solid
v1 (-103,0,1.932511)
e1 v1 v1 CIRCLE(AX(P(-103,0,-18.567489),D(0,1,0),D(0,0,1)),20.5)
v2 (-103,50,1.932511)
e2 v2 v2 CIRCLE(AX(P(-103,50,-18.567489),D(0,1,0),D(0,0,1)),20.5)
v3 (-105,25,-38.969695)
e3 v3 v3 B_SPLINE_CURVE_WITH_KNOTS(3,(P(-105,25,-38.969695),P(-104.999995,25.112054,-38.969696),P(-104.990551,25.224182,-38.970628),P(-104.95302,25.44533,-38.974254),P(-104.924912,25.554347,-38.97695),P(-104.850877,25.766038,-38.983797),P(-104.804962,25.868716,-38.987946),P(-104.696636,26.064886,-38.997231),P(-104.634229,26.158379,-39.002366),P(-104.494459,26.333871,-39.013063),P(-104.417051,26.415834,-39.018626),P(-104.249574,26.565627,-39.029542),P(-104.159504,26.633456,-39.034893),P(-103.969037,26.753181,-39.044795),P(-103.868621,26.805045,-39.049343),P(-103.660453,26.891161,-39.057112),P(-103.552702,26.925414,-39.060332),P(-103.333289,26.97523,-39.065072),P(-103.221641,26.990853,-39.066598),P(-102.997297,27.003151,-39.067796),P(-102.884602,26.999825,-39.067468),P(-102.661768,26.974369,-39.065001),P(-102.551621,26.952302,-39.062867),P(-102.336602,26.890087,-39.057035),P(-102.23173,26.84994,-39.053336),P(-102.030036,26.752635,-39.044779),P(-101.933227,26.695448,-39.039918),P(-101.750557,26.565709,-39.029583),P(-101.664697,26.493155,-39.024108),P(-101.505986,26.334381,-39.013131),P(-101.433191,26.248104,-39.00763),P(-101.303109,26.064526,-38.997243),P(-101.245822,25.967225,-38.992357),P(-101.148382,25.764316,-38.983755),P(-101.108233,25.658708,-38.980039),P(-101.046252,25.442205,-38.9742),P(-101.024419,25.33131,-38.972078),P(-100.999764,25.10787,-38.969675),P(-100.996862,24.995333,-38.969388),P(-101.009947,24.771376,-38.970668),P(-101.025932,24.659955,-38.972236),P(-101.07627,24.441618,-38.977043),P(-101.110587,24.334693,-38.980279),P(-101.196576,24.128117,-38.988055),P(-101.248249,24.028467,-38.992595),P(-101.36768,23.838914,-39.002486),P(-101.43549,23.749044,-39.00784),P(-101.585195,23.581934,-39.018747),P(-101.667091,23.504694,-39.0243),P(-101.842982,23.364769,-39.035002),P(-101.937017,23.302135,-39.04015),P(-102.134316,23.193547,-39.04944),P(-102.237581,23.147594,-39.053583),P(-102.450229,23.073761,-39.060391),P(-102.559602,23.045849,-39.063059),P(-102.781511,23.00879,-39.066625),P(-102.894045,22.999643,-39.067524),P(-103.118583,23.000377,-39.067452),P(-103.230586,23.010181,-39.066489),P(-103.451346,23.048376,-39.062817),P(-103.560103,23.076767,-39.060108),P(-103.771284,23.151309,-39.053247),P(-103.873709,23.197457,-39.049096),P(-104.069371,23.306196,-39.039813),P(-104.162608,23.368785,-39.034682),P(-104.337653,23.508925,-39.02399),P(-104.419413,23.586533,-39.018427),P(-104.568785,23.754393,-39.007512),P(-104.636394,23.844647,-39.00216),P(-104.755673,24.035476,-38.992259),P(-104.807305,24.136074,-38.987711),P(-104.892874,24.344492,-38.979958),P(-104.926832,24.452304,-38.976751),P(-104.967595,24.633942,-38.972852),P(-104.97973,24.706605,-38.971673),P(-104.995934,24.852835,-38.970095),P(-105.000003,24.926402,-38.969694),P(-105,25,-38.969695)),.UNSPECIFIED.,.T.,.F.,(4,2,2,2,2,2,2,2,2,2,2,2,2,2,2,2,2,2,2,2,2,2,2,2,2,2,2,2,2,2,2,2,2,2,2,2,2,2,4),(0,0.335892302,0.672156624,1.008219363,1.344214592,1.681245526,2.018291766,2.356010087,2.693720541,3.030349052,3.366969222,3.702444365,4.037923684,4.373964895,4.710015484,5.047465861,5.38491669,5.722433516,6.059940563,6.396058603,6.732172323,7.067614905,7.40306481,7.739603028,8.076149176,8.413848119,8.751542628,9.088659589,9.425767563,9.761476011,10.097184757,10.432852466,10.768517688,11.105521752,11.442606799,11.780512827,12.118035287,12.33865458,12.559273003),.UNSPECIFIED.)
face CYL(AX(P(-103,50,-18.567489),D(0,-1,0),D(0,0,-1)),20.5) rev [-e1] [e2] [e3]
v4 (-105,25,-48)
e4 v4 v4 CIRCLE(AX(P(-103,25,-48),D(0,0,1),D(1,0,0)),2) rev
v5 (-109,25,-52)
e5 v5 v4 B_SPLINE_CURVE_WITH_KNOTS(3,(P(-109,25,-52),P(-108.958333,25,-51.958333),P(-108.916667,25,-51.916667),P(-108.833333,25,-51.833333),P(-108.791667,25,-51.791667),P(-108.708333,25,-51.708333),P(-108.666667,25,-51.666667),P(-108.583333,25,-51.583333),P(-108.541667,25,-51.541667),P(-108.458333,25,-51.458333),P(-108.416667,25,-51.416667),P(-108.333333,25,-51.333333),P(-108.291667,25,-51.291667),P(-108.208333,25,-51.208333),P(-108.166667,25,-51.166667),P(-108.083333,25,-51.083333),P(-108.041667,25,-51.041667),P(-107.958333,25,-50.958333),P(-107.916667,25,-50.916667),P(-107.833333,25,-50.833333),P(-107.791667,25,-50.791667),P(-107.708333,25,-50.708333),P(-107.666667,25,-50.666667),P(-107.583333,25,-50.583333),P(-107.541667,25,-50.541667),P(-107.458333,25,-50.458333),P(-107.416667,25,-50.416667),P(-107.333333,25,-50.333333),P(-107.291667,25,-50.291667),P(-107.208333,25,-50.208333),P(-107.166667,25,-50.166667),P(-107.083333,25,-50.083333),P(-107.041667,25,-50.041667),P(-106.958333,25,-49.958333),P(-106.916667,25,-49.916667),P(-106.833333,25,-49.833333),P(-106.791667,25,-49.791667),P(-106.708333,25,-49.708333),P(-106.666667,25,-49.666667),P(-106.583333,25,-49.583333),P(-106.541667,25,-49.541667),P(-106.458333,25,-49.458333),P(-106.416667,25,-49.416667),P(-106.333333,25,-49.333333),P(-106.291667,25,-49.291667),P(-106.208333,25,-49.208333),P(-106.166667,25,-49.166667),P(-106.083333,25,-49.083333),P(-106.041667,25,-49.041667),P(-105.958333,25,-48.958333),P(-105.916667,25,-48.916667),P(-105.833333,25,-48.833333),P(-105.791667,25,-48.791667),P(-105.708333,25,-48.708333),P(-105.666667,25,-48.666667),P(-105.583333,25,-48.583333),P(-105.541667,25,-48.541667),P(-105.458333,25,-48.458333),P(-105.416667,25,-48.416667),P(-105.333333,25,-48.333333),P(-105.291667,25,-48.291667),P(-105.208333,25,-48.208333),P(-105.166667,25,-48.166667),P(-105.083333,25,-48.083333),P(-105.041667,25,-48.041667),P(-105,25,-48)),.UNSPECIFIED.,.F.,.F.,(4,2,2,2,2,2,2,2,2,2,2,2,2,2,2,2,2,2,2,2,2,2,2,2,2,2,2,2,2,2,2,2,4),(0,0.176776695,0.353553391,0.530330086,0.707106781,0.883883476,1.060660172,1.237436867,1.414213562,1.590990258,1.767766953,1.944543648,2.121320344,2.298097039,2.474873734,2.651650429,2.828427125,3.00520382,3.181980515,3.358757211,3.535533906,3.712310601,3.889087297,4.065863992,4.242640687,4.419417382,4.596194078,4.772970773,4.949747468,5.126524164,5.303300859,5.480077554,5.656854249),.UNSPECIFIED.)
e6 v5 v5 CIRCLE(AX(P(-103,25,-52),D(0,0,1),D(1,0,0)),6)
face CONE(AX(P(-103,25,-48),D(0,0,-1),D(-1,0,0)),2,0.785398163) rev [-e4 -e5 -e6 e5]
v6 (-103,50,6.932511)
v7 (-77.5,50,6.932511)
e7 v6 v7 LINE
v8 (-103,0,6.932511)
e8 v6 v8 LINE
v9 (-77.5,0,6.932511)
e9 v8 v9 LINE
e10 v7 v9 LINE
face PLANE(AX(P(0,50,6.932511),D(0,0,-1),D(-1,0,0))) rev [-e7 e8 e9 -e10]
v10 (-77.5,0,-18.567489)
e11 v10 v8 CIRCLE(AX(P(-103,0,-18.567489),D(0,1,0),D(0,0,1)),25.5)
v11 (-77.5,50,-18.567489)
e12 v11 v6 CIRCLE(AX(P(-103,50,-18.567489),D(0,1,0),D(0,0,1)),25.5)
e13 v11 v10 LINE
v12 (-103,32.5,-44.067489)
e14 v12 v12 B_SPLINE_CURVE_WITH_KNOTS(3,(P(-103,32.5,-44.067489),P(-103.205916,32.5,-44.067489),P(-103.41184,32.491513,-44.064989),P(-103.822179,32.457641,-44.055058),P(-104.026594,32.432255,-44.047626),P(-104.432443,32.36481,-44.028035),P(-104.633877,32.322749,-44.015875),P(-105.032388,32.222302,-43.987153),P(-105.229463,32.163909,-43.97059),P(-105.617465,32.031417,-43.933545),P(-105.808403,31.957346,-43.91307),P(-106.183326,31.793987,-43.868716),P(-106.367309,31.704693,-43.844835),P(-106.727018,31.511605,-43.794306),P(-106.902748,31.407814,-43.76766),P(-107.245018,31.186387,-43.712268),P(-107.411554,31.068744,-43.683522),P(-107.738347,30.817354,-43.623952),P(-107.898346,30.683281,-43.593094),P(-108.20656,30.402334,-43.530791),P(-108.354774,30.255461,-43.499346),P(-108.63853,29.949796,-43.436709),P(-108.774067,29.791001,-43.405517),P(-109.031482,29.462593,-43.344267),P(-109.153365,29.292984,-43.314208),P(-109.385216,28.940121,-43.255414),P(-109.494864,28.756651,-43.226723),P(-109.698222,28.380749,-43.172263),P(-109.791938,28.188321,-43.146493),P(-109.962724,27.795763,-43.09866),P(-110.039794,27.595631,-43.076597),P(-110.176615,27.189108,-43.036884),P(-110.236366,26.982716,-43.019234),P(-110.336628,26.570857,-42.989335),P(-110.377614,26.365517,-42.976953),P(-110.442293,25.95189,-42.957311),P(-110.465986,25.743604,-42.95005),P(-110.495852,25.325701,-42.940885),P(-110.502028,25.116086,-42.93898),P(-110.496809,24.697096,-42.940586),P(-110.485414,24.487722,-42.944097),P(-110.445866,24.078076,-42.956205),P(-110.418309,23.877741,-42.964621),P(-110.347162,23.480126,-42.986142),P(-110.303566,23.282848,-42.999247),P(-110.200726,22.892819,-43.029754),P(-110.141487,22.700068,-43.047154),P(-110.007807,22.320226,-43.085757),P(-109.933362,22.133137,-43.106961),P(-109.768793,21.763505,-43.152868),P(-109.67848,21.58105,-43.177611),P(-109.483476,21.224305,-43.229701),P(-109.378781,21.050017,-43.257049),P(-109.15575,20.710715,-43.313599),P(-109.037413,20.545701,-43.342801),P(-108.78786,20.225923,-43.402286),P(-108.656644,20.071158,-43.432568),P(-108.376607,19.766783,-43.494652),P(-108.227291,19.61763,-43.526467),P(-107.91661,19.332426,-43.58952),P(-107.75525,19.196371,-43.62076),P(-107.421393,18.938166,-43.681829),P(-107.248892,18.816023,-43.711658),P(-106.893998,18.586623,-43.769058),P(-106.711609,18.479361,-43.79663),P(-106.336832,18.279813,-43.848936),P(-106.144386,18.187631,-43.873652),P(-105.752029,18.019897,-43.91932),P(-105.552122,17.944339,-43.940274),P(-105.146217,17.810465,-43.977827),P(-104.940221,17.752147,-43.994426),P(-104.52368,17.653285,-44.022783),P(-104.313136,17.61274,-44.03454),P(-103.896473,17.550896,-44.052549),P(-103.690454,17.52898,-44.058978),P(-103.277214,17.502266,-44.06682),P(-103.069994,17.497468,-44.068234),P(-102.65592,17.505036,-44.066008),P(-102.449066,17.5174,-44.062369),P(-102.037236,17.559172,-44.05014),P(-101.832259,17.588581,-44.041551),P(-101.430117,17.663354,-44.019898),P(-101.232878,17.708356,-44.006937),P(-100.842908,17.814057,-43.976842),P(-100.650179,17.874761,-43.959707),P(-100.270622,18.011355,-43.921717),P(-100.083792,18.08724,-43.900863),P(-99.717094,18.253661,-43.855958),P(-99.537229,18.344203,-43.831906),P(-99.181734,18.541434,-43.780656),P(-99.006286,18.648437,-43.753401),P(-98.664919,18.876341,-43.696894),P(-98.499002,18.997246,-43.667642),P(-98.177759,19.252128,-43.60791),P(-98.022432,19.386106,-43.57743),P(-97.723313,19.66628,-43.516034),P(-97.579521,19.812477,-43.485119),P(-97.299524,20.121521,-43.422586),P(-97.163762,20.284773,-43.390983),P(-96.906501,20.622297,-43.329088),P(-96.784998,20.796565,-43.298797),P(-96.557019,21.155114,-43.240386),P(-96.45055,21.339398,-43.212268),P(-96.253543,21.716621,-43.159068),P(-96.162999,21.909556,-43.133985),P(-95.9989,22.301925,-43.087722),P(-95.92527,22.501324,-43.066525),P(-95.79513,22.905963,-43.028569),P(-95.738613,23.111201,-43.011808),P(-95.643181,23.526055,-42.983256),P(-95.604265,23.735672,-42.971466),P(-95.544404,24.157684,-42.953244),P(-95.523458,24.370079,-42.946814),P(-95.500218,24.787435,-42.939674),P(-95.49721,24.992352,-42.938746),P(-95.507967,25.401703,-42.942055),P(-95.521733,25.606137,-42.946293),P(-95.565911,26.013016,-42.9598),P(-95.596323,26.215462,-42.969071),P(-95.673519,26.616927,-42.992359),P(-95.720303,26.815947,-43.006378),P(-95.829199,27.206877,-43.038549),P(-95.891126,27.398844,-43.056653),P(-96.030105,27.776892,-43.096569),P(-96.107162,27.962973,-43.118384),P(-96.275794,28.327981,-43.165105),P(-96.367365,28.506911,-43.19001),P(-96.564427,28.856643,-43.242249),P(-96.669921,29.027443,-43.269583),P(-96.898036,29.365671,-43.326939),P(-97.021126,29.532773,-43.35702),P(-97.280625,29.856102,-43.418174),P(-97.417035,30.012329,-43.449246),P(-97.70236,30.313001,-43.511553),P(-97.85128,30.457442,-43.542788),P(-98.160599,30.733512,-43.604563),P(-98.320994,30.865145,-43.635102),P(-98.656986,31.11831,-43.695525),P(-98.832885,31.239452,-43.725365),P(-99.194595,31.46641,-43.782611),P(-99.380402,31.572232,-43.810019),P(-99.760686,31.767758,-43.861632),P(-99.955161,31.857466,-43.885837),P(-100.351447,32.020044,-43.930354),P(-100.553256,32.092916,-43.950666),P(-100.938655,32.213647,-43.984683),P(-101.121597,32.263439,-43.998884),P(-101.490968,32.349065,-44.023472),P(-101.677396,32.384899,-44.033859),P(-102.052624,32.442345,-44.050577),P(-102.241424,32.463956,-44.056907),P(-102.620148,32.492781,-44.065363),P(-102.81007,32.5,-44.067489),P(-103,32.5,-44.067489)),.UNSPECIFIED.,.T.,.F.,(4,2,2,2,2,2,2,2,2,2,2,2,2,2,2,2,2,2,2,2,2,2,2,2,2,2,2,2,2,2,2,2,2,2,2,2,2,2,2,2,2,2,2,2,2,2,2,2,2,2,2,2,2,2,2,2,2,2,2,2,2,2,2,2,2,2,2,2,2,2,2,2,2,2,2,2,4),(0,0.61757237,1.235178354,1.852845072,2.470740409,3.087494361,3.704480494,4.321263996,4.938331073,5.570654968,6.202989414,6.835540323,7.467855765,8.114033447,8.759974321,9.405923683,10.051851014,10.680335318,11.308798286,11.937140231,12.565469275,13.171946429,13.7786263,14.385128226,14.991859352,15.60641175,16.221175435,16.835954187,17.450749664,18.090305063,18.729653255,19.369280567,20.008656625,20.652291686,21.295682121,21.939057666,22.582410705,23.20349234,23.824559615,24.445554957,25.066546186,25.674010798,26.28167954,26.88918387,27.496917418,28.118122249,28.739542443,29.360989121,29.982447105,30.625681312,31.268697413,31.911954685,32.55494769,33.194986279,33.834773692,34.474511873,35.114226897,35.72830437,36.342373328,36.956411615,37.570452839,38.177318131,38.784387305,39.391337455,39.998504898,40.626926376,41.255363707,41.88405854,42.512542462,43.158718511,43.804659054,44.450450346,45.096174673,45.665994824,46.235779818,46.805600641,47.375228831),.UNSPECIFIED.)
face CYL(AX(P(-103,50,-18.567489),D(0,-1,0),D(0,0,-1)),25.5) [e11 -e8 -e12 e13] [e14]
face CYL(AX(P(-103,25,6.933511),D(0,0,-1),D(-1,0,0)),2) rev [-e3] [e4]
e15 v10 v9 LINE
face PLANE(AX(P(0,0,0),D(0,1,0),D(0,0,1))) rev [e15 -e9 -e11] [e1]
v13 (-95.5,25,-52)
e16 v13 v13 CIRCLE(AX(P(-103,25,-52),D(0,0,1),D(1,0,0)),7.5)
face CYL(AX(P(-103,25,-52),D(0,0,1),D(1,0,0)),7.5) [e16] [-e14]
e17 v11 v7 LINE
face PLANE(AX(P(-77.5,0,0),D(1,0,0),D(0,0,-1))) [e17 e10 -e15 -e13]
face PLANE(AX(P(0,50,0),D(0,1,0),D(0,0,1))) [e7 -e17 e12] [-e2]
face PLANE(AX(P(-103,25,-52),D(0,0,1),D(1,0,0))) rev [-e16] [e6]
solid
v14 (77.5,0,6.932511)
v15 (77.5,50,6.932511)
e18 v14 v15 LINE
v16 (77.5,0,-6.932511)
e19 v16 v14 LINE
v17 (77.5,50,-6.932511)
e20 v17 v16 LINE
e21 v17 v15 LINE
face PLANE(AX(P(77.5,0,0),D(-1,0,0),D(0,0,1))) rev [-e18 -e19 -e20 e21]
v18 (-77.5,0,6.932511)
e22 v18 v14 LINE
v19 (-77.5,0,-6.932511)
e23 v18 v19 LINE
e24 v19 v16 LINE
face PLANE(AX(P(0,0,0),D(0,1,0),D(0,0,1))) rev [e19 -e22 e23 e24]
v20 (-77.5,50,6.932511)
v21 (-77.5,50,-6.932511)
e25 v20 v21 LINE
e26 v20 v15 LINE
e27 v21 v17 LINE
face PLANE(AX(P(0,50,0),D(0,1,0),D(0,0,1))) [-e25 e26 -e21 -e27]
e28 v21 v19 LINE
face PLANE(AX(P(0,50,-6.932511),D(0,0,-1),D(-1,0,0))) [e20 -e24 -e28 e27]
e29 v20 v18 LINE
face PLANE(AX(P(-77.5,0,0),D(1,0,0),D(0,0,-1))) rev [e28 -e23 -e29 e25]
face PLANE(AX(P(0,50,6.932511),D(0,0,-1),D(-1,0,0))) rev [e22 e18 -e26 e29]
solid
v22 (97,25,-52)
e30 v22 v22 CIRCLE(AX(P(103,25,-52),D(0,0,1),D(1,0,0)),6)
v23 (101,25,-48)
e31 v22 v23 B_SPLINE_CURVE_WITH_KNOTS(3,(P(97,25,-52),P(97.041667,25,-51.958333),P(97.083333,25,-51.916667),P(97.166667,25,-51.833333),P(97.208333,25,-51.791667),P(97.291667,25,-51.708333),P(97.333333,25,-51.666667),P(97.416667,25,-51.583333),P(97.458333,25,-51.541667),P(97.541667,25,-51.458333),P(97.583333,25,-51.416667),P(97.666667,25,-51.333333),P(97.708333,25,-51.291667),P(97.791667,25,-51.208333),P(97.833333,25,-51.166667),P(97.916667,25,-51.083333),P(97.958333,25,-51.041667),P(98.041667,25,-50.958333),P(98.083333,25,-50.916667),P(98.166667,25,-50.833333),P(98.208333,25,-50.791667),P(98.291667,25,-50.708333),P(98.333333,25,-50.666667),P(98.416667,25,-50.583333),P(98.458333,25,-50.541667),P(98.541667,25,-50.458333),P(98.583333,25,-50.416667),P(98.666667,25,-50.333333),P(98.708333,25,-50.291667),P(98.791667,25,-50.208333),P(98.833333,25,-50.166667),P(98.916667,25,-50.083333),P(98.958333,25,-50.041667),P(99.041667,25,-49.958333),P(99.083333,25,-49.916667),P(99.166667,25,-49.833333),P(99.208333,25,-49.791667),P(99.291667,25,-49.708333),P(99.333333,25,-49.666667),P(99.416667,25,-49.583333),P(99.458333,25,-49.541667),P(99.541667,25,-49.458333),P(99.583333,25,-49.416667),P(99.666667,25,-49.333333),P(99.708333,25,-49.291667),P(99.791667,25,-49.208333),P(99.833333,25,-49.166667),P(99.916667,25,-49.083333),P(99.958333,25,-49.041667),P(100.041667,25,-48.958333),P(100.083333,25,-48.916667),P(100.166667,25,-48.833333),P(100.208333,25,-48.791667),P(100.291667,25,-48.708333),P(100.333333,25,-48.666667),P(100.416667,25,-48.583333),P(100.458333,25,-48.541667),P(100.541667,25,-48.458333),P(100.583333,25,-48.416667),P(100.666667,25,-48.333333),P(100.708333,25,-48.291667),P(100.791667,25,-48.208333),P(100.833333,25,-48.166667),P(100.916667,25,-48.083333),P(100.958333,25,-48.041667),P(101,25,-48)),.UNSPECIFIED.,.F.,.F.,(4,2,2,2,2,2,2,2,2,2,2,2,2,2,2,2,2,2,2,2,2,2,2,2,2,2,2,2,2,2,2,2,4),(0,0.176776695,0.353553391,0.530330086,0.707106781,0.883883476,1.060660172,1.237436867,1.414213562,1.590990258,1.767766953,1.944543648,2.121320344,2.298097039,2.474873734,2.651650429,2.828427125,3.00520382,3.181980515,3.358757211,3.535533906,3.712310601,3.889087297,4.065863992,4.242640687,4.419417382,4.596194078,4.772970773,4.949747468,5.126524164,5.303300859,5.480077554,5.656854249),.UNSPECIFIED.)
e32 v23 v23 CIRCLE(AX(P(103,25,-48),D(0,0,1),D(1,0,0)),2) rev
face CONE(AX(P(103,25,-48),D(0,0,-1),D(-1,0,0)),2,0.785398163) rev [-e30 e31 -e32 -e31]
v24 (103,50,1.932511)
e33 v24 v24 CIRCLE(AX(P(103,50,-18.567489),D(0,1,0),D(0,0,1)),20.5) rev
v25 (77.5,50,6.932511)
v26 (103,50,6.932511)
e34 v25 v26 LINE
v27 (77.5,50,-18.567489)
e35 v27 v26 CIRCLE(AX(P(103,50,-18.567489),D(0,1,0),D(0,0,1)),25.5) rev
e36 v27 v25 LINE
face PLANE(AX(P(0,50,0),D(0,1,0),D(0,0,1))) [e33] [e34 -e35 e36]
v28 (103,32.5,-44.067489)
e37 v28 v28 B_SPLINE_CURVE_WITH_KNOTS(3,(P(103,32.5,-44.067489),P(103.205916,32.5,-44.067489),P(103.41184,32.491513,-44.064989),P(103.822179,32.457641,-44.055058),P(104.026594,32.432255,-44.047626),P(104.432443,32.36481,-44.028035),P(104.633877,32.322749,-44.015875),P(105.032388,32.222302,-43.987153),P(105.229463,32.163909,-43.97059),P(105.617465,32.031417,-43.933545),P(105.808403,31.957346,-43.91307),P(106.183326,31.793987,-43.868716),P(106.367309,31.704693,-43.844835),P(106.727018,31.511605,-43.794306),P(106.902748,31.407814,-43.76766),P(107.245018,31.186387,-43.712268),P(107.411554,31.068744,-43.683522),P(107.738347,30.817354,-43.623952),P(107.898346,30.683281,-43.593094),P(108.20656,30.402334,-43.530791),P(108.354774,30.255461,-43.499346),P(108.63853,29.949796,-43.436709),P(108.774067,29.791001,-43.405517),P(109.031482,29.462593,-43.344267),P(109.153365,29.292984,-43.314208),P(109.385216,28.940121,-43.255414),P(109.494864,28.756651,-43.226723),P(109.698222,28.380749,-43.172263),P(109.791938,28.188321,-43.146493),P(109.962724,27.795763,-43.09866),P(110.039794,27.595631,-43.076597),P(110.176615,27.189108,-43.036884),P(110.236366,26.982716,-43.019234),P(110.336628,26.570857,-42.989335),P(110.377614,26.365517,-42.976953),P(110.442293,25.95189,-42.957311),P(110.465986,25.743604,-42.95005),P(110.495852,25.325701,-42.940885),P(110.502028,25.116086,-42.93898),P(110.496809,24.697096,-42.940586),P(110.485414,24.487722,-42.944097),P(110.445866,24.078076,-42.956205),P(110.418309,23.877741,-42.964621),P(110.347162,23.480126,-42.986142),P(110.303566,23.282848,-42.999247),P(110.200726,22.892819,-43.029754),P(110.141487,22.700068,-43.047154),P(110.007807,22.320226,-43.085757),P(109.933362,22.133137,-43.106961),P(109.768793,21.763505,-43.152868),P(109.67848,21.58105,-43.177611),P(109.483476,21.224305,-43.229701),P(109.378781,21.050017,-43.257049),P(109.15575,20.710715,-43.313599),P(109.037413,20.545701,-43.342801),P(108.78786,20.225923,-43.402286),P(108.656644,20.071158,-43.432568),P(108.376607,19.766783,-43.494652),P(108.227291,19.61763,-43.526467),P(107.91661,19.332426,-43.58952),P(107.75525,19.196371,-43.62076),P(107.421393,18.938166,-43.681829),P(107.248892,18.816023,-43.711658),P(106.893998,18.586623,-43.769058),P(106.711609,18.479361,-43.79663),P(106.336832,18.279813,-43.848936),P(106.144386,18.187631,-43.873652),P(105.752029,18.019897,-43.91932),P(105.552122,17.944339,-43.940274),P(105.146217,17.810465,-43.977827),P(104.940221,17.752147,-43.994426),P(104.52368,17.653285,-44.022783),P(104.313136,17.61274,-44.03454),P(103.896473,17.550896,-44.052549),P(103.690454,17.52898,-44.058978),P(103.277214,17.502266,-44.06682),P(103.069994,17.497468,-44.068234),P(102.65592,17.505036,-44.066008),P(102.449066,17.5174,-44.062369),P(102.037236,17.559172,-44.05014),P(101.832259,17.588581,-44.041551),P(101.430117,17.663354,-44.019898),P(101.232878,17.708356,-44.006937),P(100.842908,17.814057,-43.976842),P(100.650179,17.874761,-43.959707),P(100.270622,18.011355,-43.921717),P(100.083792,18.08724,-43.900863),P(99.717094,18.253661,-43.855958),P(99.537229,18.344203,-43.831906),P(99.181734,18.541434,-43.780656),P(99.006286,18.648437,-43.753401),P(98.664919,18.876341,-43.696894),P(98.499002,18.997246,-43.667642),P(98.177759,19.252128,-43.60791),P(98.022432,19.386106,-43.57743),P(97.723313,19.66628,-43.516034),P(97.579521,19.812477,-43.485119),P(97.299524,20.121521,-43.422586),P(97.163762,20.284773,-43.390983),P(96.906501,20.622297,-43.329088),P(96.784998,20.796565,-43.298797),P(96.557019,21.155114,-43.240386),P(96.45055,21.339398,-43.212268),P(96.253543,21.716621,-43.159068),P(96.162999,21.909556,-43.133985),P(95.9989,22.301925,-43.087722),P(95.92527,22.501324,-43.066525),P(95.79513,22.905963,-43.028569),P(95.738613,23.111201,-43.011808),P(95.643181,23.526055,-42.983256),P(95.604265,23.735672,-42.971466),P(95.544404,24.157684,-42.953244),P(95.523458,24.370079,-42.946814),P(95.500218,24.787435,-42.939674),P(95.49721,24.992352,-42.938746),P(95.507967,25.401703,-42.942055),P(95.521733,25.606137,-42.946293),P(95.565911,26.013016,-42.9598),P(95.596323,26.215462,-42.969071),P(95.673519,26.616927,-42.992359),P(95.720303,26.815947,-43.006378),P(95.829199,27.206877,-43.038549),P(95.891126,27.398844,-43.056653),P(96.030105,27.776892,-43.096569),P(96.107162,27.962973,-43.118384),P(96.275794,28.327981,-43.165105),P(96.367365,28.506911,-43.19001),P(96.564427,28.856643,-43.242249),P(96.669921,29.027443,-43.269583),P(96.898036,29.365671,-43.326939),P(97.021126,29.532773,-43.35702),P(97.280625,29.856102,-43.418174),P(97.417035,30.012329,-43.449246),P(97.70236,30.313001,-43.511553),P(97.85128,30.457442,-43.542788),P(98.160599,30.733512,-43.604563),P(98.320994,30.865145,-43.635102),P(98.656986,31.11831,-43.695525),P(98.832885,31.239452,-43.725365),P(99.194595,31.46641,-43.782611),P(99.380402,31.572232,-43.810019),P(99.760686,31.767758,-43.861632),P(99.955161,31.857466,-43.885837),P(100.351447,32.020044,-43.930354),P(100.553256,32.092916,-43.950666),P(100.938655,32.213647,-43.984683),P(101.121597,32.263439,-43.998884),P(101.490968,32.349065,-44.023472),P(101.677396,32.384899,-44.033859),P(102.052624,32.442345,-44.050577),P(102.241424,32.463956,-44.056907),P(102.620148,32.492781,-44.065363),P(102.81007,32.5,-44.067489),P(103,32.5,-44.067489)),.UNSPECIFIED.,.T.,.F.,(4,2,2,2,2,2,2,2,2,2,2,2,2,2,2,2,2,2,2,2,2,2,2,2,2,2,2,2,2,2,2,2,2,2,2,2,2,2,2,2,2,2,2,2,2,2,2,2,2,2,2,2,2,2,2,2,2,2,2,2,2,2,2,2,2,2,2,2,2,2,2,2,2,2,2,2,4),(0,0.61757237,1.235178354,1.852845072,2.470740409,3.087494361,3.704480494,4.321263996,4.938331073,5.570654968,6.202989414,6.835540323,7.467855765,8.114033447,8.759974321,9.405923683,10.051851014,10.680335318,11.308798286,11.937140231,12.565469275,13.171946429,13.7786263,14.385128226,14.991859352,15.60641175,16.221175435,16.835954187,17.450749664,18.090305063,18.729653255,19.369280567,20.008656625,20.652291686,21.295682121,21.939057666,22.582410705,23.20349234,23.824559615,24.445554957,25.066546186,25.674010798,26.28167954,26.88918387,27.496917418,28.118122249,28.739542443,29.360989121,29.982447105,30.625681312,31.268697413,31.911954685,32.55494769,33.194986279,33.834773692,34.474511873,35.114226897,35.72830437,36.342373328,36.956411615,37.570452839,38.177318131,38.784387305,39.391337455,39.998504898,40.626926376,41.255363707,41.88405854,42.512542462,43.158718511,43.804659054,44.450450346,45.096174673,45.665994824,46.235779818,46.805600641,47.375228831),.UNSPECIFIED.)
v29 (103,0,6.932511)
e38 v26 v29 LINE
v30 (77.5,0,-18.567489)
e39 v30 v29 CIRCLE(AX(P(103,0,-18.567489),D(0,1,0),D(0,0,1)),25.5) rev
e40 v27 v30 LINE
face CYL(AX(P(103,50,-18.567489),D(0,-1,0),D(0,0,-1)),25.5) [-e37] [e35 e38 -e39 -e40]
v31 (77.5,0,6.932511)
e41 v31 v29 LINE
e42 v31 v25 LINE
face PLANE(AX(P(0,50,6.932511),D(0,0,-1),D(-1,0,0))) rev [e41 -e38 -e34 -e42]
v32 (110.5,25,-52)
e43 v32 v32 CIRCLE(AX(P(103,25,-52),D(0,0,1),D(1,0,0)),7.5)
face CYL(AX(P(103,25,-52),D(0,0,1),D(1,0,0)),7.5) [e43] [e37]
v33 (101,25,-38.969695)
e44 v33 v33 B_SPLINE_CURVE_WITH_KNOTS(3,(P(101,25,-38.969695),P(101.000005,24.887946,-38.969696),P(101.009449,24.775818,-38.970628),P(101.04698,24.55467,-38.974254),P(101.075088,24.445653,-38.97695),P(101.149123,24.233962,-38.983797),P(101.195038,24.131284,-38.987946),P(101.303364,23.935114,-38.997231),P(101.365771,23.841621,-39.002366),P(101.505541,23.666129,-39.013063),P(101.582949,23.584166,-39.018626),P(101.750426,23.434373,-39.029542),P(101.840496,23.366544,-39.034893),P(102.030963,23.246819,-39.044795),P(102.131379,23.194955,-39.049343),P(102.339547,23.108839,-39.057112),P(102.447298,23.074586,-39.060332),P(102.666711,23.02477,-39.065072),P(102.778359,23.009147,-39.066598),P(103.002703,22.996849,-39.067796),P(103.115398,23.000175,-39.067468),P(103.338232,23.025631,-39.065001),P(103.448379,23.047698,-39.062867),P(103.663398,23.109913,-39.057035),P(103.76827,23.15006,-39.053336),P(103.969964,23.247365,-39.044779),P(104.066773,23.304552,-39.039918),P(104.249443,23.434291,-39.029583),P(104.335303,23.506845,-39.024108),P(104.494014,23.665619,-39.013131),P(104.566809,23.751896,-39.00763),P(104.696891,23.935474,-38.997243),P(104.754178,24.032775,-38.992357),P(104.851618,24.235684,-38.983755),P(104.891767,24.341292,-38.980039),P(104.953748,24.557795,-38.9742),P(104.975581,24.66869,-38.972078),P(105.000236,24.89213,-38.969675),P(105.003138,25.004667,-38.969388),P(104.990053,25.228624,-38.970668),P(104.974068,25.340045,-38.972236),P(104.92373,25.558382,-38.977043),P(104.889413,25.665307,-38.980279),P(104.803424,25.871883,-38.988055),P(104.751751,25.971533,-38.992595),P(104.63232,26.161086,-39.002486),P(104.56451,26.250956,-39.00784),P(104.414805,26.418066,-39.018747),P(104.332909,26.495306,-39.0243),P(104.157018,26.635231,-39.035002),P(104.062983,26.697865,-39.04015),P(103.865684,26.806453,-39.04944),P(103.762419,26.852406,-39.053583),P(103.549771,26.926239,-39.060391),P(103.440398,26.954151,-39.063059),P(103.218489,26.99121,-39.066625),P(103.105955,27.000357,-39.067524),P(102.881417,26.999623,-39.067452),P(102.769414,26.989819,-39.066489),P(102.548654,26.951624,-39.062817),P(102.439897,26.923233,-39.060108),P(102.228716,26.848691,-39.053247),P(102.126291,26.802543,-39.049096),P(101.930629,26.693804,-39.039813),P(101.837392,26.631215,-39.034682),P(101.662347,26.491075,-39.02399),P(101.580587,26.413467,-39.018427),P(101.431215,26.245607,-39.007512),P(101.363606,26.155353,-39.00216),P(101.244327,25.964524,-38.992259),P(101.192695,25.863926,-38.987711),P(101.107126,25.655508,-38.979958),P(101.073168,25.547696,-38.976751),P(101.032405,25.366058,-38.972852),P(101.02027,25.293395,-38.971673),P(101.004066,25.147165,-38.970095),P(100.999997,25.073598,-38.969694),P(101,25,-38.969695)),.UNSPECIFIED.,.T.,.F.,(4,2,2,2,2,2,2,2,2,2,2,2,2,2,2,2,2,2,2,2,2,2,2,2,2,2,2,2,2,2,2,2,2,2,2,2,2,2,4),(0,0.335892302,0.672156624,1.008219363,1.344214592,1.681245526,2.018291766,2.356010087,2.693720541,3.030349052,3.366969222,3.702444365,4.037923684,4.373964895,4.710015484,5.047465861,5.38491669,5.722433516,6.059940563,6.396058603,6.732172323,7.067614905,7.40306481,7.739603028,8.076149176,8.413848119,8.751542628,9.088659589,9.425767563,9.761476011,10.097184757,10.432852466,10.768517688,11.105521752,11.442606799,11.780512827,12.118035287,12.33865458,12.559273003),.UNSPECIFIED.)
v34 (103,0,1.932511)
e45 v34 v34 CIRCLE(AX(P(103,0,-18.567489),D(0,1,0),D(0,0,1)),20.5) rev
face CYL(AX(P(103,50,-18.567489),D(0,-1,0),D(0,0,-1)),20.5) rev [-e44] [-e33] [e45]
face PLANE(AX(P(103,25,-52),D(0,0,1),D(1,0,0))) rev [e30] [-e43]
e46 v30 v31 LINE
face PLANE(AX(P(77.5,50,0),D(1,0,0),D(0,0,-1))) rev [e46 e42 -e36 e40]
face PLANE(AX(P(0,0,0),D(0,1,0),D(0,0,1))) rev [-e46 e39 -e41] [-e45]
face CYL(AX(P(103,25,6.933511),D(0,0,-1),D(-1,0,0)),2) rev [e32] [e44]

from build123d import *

# Parameters (mm, degrees)
SKETCH2_R           = 20.5
BOSS_EXTRUDE1_DEPTH = 50
SKETCH3_R           = 7.5
BOSS_EXTRUDE2_DEPTH = 10
CUT_EXTRUDE1_REACH  = 151.951
SKETCH4_R           = 2
CHAMFER1_SIZE       = 4
SPLIT1_START        = -48.0000001
SPLIT1_OUTLINE_R    = 7.5
SPLIT1_OUTLINE_R_2  = 2
SPLIT1_DEPTH        = 8.932510964
SPLIT1_2_OUTLINE_R  = 20.5
SPLIT1_2_DEPTH      = 50
SPLIT1_3_OUTLINE_W  = 2
SPLIT1_3_OUTLINE_H  = 9.030358149
SPLIT1_START_2      = -77.5
SPLIT1_5_OUTLINE_W  = 50
SPLIT1_5_OUTLINE_H  = 13.865021928
SPLIT1_5_DEPTH      = 155
SPLIT1_START_3      = -130
SPLIT1_6_OUTLINE_W  = 50
SPLIT1_6_OUTLINE_H  = 58.932510964
SPLIT1_6_DEPTH      = 207.5


with BuildPart() as part:
    # Sketch2 → Boss-Extrude1 (new body)
    # profile 1 of 2: a face of its own
    with BuildSketch(Plane(origin=(0, 0, 0), x_dir=(1, 0, 0), z_dir=(0, 1, 0))):
        with BuildLine():
            ThreePointArc((-77.5, 18.567489036), (-121.03122292, 36.598711956), (-103, -6.932510964))
            Line((-103, -6.932510964), (-85, -6.932510964))
            Line((-85, -6.932510964), (0, -6.932510964))
            Line((0, -6.932510964), (0, 6.932510964))
            Line((0, 6.932510964), (-77.5, 6.932510964))
            Line((-77.5, 6.932510964), (-77.5, 18.567489036))
        make_face()
        with Locations(Location((-103, 18.567489036, 0), (0, 0, 270))):
            Circle(SKETCH2_R, mode=Mode.SUBTRACT)
    # profile 2 of 2: a face of its own
    with BuildSketch(Plane(origin=(0, 0, 0), x_dir=(1, 0, 0), z_dir=(0, 1, 0))):
        with BuildLine():
            Line((0, 6.932510964), (0, -6.932510964))
            Line((0, -6.932510964), (85, -6.932510964))
            Line((85, -6.932510964), (103, -6.932510964))
            ThreePointArc((103, -6.932510964), (121.03122292, 36.598711956), (77.5, 18.567489036))
            Line((77.5, 18.567489036), (77.5, 6.932510964))
            Line((77.5, 6.932510964), (0, 6.932510964))
        make_face()
        with Locations(Location((103, 18.567489036, 0), (0, 0, 270))):
            Circle(SKETCH2_R, mode=Mode.SUBTRACT)
    extrude(amount=BOSS_EXTRUDE1_DEPTH)

    # Sketch3 → Boss-Extrude2 (add)
    with BuildSketch(Plane.XY.offset(-42)):
        with Locations((103, 25)):
            Circle(SKETCH3_R)
        with Locations((-103, 25)):
            Circle(SKETCH3_R)
    extrude(amount=-BOSS_EXTRUDE2_DEPTH)

    # Sketch4 → Cut-Extrude1 (cut, up to next)
    with BuildSketch(Plane(origin=(0, 0, -52), x_dir=(-1, 0, 0), z_dir=(0, 0, -1)), mode=Mode.PRIVATE) as cut_extrude1_sk1:
        with Locations((103, 25)):
            Circle(SKETCH4_R)
    cut_extrude1_tool1 = extrude(cut_extrude1_sk1.sketch, amount=-CUT_EXTRUDE1_REACH, mode=Mode.PRIVATE) & part.part
    # Sketch4 → Cut-Extrude1 (cut, up to next)
    with BuildSketch(Plane(origin=(0, 0, -52), x_dir=(-1, 0, 0), z_dir=(0, 0, -1)), mode=Mode.PRIVATE) as cut_extrude1_sk2:
        with Locations((-103, 25)):
            Circle(SKETCH4_R)
    cut_extrude1_tool2 = extrude(cut_extrude1_sk2.sketch, amount=-CUT_EXTRUDE1_REACH, mode=Mode.PRIVATE) & part.part
    add(cut_extrude1_tool1.solids().sort_by_distance((-103, 25, -52))[0], mode=Mode.SUBTRACT)
    add(cut_extrude1_tool2.solids().sort_by_distance((103, 25, -52))[0], mode=Mode.SUBTRACT)

    # Chamfer1
    chamfer1_edges = [part.edges().sort_by_distance(p)[0] for p in [
        (-101, 25, -52),
        (105, 25, -52),
    ]]
    chamfer(chamfer1_edges, length=CHAMFER1_SIZE)

    # Split1 6 outline → Split1 6 (cut)
    with BuildSketch(Plane.YZ.offset(SPLIT1_START_3)):
        with Locations((25, -22.533744518)):
            Rectangle(SPLIT1_6_OUTLINE_W, SPLIT1_6_OUTLINE_H)
    extrude(amount=SPLIT1_6_DEPTH, mode=Mode.SUBTRACT)


with BuildPart() as body_2:
    # Split1: read off the stored shape, not the designer's step
    # Split1 outline → Split1 (new body)
    with BuildSketch(Plane.XY.offset(SPLIT1_START)):
        with Locations((-103, 25)):
            Circle(SPLIT1_OUTLINE_R)
        with Locations((-103, 25)):
            Circle(SPLIT1_OUTLINE_R_2, mode=Mode.SUBTRACT)
    extrude(amount=SPLIT1_DEPTH)

    # Split1 2 outline → Split1 2 (add)
    with BuildSketch(Plane(origin=(0, 0, 0), x_dir=(1, 0, 0), z_dir=(0, 1, 0))):
        with BuildLine():
            Line((-103, -6.932510964), (-77.5, -6.932510964))
            Line((-77.5, -6.932510964), (-77.5, 18.567489036))
            ThreePointArc((-77.5, 18.567489036), (-121.03122292, 36.598711956), (-103, -6.932510964))
        make_face()
        with Locations((-103, 18.567489036)):
            Circle(SPLIT1_2_OUTLINE_R, mode=Mode.SUBTRACT)
    extrude(amount=SPLIT1_2_DEPTH)

    # Split1 3 outline → Split1 3 (revolve, cut)
    with BuildSketch(Plane(origin=(-103, 25, 0), x_dir=(1, 0, 0), z_dir=(0, -1, 0))):
        with Locations((1, -43.484821025)):
            Rectangle(SPLIT1_3_OUTLINE_W, SPLIT1_3_OUTLINE_H)
    revolve(axis=Axis((-103, 25, 0), (0, 0, 1)), mode=Mode.SUBTRACT)

    # Split1 4 outline → Split1 4 (revolve)
    with BuildSketch(Plane(origin=(-103, 25, 0), x_dir=(1, 0, 0), z_dir=(0, -1, 0))):
        Polygon((7.5, -48.0000001), (2, -48.0000001), (6, -52), (7.5, -52), align=None)
    revolve(axis=Axis((-103, 25, 0), (0, 0, 1)))


with BuildPart() as body_3:
    # Split1 5 outline → Split1 5 (new body)
    with BuildSketch(Plane.YZ.offset(SPLIT1_START_2)):
        with Locations((25, 0)):
            Rectangle(SPLIT1_5_OUTLINE_W, SPLIT1_5_OUTLINE_H)
    extrude(amount=SPLIT1_5_DEPTH)


solid = Compound([part.part, body_2.part, body_3.part])
